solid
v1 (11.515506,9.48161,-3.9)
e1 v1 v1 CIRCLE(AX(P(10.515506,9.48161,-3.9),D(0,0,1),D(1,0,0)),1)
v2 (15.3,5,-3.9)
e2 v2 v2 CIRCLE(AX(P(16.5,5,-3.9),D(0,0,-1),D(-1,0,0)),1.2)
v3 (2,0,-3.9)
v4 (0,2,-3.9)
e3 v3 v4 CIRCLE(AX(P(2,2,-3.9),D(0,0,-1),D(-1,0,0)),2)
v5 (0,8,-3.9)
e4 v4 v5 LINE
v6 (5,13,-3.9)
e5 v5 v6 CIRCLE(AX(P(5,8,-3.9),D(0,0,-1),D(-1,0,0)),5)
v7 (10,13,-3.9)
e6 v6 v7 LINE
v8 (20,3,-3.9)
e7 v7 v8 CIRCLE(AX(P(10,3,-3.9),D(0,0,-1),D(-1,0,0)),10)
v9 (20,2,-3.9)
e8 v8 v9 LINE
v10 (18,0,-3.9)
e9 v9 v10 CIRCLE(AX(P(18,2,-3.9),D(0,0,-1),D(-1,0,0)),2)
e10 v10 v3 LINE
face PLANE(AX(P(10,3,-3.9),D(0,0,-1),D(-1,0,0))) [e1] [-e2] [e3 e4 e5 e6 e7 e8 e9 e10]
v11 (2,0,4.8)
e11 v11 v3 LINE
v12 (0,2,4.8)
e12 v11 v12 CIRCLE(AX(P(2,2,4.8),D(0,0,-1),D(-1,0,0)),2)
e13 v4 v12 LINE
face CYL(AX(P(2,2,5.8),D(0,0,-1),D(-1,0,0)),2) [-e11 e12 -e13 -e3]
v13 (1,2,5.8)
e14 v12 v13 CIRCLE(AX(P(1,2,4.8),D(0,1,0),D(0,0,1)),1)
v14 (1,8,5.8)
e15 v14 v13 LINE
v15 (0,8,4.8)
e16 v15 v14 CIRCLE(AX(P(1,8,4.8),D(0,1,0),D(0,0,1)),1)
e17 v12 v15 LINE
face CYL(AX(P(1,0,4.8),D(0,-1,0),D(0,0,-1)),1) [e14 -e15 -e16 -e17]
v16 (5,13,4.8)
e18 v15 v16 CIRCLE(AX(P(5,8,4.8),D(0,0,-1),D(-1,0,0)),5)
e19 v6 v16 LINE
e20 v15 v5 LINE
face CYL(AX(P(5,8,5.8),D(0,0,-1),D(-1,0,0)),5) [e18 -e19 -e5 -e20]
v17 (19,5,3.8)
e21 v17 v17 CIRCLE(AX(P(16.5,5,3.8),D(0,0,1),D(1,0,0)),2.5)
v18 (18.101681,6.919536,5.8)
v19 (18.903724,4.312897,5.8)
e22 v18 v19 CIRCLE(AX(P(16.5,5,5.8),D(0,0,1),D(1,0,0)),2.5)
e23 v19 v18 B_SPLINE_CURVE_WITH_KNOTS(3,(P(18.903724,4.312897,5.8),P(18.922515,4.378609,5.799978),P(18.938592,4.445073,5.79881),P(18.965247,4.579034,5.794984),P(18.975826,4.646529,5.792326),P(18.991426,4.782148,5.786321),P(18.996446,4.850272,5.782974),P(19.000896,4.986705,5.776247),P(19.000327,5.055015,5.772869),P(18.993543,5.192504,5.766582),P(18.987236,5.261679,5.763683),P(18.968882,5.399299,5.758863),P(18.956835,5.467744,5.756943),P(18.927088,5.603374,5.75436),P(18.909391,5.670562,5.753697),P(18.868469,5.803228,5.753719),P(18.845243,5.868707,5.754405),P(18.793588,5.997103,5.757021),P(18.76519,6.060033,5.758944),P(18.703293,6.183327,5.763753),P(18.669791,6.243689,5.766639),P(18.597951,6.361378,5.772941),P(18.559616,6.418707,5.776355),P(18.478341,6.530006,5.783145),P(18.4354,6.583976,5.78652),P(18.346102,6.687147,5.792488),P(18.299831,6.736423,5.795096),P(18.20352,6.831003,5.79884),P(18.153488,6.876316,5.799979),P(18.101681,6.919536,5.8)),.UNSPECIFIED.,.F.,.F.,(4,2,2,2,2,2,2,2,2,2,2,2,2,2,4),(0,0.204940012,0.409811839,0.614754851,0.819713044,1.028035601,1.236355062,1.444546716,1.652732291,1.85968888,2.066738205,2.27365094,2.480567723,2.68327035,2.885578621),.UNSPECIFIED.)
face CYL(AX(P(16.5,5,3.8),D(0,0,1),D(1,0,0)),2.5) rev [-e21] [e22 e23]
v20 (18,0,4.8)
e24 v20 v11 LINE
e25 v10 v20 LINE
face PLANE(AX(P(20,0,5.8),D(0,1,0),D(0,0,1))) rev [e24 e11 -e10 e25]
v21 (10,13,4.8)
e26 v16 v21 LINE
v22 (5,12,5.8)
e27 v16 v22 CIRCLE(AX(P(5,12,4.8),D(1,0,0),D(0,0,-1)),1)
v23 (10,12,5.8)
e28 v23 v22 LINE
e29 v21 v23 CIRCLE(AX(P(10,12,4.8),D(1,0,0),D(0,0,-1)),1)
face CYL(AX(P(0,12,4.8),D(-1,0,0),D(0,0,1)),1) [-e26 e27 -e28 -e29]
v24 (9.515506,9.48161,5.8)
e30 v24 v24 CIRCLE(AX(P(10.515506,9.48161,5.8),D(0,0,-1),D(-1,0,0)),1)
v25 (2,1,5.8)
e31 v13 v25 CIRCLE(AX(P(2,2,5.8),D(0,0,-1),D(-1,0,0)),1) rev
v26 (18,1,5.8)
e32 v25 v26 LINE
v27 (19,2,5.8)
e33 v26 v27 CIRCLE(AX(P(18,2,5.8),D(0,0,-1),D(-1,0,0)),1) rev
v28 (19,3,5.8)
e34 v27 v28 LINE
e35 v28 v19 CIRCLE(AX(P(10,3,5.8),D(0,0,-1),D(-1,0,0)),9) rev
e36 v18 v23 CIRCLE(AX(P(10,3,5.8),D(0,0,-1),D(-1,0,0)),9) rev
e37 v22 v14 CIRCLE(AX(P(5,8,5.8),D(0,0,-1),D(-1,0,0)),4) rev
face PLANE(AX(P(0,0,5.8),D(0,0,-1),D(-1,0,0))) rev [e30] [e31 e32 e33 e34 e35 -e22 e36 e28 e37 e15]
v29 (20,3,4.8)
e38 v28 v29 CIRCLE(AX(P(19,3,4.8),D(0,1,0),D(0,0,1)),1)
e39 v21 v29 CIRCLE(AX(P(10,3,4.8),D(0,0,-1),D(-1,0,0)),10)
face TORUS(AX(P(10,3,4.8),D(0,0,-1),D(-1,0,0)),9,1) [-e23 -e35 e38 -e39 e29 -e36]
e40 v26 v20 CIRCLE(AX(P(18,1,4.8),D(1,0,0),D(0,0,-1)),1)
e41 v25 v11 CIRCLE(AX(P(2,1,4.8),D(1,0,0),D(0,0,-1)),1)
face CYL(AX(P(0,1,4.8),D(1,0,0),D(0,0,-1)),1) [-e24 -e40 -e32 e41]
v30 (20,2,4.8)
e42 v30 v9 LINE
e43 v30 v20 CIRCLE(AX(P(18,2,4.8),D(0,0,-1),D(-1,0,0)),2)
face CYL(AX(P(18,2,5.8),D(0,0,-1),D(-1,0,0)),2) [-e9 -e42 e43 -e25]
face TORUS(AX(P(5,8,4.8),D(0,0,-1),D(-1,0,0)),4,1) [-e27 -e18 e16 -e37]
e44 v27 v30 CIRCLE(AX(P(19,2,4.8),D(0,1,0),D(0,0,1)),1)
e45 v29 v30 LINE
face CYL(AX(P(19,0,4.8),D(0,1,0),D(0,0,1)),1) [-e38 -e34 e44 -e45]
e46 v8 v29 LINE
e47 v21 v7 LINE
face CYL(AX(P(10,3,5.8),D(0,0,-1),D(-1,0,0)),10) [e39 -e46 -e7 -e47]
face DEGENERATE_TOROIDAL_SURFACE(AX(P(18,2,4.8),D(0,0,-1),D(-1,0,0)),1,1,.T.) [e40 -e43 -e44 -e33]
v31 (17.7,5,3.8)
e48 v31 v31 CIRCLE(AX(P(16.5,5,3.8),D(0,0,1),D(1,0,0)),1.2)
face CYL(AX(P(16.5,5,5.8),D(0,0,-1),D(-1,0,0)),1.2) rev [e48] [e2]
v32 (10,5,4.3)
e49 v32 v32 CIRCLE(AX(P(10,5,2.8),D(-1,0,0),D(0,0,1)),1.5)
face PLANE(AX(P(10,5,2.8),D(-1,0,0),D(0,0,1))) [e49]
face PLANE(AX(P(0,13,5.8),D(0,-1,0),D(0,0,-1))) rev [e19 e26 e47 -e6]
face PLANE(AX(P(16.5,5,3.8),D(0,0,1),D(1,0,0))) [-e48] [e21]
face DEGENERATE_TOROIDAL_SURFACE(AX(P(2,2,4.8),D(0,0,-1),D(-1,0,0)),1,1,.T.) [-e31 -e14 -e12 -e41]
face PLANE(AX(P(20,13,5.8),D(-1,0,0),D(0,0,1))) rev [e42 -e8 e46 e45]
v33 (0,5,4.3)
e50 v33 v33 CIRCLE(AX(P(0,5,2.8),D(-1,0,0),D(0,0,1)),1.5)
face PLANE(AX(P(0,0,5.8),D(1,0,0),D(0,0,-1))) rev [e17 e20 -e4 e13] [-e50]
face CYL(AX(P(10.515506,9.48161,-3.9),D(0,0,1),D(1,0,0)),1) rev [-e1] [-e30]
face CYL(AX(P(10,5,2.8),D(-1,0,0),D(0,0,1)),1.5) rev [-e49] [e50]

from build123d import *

# Parameters (mm, degrees)
SKETCH1_W               = 20
SKETCH1_H               = 13
SKETCH1_R               = 1.2
BOSS_EXTRUDE1_DEPTH     = 5.8
SKETCH2_R               = 2.5
CUT_EXTRUDE1_DEPTH      = 2
SKETCH3_R               = 1.5
CUT_EXTRUDE2_DEPTH      = 10
FILLET1_R               = 10
FILLET2_R               = 5
FILLET3_R               = 2
FILLET4_R               = 1
SKETCH5_R               = 1.2
BOSS_EXTRUDE2_DEPTH     = 3.9
CUT_EXTRUDE3_DEPTH      = 26.750534103
CUT_EXTRUDE3_DEPTH_BACK = 26.750534103
SKETCH6_R               = 1


with BuildPart() as part:
    # Sketch1 → Boss-Extrude1 (new body)
    with BuildSketch(Plane.XY):
        with Locations((10, 6.5)):
            Rectangle(SKETCH1_W, SKETCH1_H)
        with Locations((16.5, 5)):
            Circle(SKETCH1_R, mode=Mode.SUBTRACT)
    extrude(amount=BOSS_EXTRUDE1_DEPTH)

    # Sketch2 → Cut-Extrude1 (cut)
    with BuildSketch(Plane.XY.offset(5.8)):
        with Locations((16.5, 5)):
            Circle(SKETCH2_R)
    extrude(amount=-CUT_EXTRUDE1_DEPTH, mode=Mode.SUBTRACT)

    # Sketch3 → Cut-Extrude2 (cut)
    with BuildSketch(Plane.ZY):
        with Locations((2.8, 5)):
            Circle(SKETCH3_R)
    extrude(amount=-CUT_EXTRUDE2_DEPTH, mode=Mode.SUBTRACT)

    # Fillet1
    fillet1_edges = [part.edges().sort_by_distance(p)[0] for p in [
        (20, 13, 2.9),
    ]]
    fillet(fillet1_edges, radius=FILLET1_R)

    # Fillet2
    fillet2_edges = [part.edges().sort_by_distance(p)[0] for p in [
        (0, 13, 2.9),
    ]]
    fillet(fillet2_edges, radius=FILLET2_R)

    # Fillet3
    fillet3_edges = [part.edges().sort_by_distance(p)[0] for p in [
        (0, 0, 2.9),
        (20, 0, 2.9),
    ]]
    fillet(fillet3_edges, radius=FILLET3_R)

    # Fillet4
    # the kernel refuses this fillet: 1 mm, written as the material it takes off along each edge
    with BuildSketch(Plane(origin=(5, 13, 5.8), x_dir=(0, 0, -1), z_dir=(1, 0, 0))) as fillet4_piece_1:
        with BuildLine():
            CenterArc((FILLET4_R, -FILLET4_R), FILLET4_R, 90, 90)
            Line((0, -FILLET4_R), (0, 0))
            Line((0, 0), (FILLET4_R, 0))
        make_face()
    extrude(amount=5, mode=Mode.SUBTRACT)
    with BuildSketch(Plane(origin=(10, 3, 5.8), x_dir=(0, 1, 0), z_dir=(-1, 0, 0))) as fillet4_piece_2:
        with BuildLine():
            CenterArc((10 - FILLET4_R, FILLET4_R), FILLET4_R, 270, 90)
            Line((10 - FILLET4_R, 0), (10, 0))
            Line((10, 0), (10, FILLET4_R))
        make_face()
    revolve(axis=Axis((10, 3, 5.8), (0, 0, -1)), revolution_arc=90, mode=Mode.SUBTRACT)
    with BuildSketch(Plane(origin=(0, 2, 5.8), x_dir=(0, 0, -1), z_dir=(0, 1, 0))) as fillet4_piece_3:
        with BuildLine():
            CenterArc((FILLET4_R, -FILLET4_R), FILLET4_R, 90, 90)
            Line((0, -FILLET4_R), (0, 0))
            Line((0, 0), (FILLET4_R, 0))
        make_face()
    extrude(amount=6, mode=Mode.SUBTRACT)
    with BuildSketch(Plane(origin=(5, 8, 5.8), x_dir=(0, 1, 0), z_dir=(1, 0, 0))) as fillet4_piece_4:
        with BuildLine():
            CenterArc((5 - FILLET4_R, -FILLET4_R), FILLET4_R, 0, 90)
            Line((5 - FILLET4_R, 0), (5, 0))
            Line((5, 0), (5, -FILLET4_R))
        make_face()
    revolve(axis=Axis((5, 8, 5.8), (0, 0, 1)), revolution_arc=90, mode=Mode.SUBTRACT)
    with BuildSketch(Plane(origin=(20, 3, 5.8), x_dir=(0, 0, -1), z_dir=(0, -1, 0))) as fillet4_piece_5:
        with BuildLine():
            CenterArc((FILLET4_R, -FILLET4_R), FILLET4_R, 90, 90)
            Line((0, -FILLET4_R), (0, 0))
            Line((0, 0), (FILLET4_R, 0))
        make_face()
    extrude(amount=1, mode=Mode.SUBTRACT)
    with BuildSketch(Plane(origin=(18, 0, 5.8), x_dir=(0, 0, -1), z_dir=(-1, 0, 0))) as fillet4_piece_6:
        with BuildLine():
            CenterArc((FILLET4_R, -FILLET4_R), FILLET4_R, 90, 90)
            Line((0, -FILLET4_R), (0, 0))
            Line((0, 0), (FILLET4_R, 0))
        make_face()
    extrude(amount=16, mode=Mode.SUBTRACT)
    with BuildSketch(Plane(origin=(2, 2, 5.8), x_dir=(-1, 0, 0), z_dir=(0, 1, 0))) as fillet4_piece_7:
        with BuildLine():
            CenterArc((2 - FILLET4_R, -FILLET4_R), FILLET4_R, 0, 90)
            Line((2 - FILLET4_R, 0), (2, 0))
            Line((2, 0), (2, -FILLET4_R))
        make_face()
    revolve(axis=Axis((2, 2, 5.8), (0, 0, 1)), revolution_arc=90, mode=Mode.SUBTRACT)
    with BuildSketch(Plane(origin=(18, 2, 5.8), x_dir=(1, 0, 0), z_dir=(0, 1, 0))) as fillet4_piece_8:
        with BuildLine():
            CenterArc((2 - FILLET4_R, FILLET4_R), FILLET4_R, 270, 90)
            Line((2 - FILLET4_R, 0), (2, 0))
            Line((2, 0), (2, FILLET4_R))
        make_face()
    revolve(axis=Axis((18, 2, 5.8), (0, 0, -1)), revolution_arc=90, mode=Mode.SUBTRACT)

    # Sketch5 → Boss-Extrude2 (add)
    with BuildSketch(Plane(origin=(0, 0, 0), x_dir=(-1, 0, 0), z_dir=(0, 0, -1))):
        with BuildLine():
            Line((-20, 3), (-20, 2))
            ThreePointArc((-20, 2), (-19.414213562, 0.585786438), (-18, 0))
            Line((-18, 0), (-2, 0))
            ThreePointArc((-2, 0), (-0.585786438, 0.585786438), (0, 2))
            Line((0, 2), (0, 8))
            ThreePointArc((0, 8), (-1.464466094, 11.535533906), (-5, 13))
            Line((-5, 13), (-10, 13))
            ThreePointArc((-10, 13), (-17.071067812, 10.071067812), (-20, 3))
        make_face()
        with Locations((-16.5, 5)):
            Circle(SKETCH5_R, mode=Mode.SUBTRACT)
    extrude(amount=BOSS_EXTRUDE2_DEPTH)

    # Sketch6 → Cut-Extrude3 (cut, two sides: drawn at the far end of the back side and taken through both)
    with BuildSketch(Plane.XY.offset(5.8).offset(-CUT_EXTRUDE3_DEPTH_BACK)):
        with Locations((10.515506471, 9.481609927)):
            Circle(SKETCH6_R)
    extrude(amount=CUT_EXTRUDE3_DEPTH + CUT_EXTRUDE3_DEPTH_BACK, mode=Mode.SUBTRACT)


solid = part.part
